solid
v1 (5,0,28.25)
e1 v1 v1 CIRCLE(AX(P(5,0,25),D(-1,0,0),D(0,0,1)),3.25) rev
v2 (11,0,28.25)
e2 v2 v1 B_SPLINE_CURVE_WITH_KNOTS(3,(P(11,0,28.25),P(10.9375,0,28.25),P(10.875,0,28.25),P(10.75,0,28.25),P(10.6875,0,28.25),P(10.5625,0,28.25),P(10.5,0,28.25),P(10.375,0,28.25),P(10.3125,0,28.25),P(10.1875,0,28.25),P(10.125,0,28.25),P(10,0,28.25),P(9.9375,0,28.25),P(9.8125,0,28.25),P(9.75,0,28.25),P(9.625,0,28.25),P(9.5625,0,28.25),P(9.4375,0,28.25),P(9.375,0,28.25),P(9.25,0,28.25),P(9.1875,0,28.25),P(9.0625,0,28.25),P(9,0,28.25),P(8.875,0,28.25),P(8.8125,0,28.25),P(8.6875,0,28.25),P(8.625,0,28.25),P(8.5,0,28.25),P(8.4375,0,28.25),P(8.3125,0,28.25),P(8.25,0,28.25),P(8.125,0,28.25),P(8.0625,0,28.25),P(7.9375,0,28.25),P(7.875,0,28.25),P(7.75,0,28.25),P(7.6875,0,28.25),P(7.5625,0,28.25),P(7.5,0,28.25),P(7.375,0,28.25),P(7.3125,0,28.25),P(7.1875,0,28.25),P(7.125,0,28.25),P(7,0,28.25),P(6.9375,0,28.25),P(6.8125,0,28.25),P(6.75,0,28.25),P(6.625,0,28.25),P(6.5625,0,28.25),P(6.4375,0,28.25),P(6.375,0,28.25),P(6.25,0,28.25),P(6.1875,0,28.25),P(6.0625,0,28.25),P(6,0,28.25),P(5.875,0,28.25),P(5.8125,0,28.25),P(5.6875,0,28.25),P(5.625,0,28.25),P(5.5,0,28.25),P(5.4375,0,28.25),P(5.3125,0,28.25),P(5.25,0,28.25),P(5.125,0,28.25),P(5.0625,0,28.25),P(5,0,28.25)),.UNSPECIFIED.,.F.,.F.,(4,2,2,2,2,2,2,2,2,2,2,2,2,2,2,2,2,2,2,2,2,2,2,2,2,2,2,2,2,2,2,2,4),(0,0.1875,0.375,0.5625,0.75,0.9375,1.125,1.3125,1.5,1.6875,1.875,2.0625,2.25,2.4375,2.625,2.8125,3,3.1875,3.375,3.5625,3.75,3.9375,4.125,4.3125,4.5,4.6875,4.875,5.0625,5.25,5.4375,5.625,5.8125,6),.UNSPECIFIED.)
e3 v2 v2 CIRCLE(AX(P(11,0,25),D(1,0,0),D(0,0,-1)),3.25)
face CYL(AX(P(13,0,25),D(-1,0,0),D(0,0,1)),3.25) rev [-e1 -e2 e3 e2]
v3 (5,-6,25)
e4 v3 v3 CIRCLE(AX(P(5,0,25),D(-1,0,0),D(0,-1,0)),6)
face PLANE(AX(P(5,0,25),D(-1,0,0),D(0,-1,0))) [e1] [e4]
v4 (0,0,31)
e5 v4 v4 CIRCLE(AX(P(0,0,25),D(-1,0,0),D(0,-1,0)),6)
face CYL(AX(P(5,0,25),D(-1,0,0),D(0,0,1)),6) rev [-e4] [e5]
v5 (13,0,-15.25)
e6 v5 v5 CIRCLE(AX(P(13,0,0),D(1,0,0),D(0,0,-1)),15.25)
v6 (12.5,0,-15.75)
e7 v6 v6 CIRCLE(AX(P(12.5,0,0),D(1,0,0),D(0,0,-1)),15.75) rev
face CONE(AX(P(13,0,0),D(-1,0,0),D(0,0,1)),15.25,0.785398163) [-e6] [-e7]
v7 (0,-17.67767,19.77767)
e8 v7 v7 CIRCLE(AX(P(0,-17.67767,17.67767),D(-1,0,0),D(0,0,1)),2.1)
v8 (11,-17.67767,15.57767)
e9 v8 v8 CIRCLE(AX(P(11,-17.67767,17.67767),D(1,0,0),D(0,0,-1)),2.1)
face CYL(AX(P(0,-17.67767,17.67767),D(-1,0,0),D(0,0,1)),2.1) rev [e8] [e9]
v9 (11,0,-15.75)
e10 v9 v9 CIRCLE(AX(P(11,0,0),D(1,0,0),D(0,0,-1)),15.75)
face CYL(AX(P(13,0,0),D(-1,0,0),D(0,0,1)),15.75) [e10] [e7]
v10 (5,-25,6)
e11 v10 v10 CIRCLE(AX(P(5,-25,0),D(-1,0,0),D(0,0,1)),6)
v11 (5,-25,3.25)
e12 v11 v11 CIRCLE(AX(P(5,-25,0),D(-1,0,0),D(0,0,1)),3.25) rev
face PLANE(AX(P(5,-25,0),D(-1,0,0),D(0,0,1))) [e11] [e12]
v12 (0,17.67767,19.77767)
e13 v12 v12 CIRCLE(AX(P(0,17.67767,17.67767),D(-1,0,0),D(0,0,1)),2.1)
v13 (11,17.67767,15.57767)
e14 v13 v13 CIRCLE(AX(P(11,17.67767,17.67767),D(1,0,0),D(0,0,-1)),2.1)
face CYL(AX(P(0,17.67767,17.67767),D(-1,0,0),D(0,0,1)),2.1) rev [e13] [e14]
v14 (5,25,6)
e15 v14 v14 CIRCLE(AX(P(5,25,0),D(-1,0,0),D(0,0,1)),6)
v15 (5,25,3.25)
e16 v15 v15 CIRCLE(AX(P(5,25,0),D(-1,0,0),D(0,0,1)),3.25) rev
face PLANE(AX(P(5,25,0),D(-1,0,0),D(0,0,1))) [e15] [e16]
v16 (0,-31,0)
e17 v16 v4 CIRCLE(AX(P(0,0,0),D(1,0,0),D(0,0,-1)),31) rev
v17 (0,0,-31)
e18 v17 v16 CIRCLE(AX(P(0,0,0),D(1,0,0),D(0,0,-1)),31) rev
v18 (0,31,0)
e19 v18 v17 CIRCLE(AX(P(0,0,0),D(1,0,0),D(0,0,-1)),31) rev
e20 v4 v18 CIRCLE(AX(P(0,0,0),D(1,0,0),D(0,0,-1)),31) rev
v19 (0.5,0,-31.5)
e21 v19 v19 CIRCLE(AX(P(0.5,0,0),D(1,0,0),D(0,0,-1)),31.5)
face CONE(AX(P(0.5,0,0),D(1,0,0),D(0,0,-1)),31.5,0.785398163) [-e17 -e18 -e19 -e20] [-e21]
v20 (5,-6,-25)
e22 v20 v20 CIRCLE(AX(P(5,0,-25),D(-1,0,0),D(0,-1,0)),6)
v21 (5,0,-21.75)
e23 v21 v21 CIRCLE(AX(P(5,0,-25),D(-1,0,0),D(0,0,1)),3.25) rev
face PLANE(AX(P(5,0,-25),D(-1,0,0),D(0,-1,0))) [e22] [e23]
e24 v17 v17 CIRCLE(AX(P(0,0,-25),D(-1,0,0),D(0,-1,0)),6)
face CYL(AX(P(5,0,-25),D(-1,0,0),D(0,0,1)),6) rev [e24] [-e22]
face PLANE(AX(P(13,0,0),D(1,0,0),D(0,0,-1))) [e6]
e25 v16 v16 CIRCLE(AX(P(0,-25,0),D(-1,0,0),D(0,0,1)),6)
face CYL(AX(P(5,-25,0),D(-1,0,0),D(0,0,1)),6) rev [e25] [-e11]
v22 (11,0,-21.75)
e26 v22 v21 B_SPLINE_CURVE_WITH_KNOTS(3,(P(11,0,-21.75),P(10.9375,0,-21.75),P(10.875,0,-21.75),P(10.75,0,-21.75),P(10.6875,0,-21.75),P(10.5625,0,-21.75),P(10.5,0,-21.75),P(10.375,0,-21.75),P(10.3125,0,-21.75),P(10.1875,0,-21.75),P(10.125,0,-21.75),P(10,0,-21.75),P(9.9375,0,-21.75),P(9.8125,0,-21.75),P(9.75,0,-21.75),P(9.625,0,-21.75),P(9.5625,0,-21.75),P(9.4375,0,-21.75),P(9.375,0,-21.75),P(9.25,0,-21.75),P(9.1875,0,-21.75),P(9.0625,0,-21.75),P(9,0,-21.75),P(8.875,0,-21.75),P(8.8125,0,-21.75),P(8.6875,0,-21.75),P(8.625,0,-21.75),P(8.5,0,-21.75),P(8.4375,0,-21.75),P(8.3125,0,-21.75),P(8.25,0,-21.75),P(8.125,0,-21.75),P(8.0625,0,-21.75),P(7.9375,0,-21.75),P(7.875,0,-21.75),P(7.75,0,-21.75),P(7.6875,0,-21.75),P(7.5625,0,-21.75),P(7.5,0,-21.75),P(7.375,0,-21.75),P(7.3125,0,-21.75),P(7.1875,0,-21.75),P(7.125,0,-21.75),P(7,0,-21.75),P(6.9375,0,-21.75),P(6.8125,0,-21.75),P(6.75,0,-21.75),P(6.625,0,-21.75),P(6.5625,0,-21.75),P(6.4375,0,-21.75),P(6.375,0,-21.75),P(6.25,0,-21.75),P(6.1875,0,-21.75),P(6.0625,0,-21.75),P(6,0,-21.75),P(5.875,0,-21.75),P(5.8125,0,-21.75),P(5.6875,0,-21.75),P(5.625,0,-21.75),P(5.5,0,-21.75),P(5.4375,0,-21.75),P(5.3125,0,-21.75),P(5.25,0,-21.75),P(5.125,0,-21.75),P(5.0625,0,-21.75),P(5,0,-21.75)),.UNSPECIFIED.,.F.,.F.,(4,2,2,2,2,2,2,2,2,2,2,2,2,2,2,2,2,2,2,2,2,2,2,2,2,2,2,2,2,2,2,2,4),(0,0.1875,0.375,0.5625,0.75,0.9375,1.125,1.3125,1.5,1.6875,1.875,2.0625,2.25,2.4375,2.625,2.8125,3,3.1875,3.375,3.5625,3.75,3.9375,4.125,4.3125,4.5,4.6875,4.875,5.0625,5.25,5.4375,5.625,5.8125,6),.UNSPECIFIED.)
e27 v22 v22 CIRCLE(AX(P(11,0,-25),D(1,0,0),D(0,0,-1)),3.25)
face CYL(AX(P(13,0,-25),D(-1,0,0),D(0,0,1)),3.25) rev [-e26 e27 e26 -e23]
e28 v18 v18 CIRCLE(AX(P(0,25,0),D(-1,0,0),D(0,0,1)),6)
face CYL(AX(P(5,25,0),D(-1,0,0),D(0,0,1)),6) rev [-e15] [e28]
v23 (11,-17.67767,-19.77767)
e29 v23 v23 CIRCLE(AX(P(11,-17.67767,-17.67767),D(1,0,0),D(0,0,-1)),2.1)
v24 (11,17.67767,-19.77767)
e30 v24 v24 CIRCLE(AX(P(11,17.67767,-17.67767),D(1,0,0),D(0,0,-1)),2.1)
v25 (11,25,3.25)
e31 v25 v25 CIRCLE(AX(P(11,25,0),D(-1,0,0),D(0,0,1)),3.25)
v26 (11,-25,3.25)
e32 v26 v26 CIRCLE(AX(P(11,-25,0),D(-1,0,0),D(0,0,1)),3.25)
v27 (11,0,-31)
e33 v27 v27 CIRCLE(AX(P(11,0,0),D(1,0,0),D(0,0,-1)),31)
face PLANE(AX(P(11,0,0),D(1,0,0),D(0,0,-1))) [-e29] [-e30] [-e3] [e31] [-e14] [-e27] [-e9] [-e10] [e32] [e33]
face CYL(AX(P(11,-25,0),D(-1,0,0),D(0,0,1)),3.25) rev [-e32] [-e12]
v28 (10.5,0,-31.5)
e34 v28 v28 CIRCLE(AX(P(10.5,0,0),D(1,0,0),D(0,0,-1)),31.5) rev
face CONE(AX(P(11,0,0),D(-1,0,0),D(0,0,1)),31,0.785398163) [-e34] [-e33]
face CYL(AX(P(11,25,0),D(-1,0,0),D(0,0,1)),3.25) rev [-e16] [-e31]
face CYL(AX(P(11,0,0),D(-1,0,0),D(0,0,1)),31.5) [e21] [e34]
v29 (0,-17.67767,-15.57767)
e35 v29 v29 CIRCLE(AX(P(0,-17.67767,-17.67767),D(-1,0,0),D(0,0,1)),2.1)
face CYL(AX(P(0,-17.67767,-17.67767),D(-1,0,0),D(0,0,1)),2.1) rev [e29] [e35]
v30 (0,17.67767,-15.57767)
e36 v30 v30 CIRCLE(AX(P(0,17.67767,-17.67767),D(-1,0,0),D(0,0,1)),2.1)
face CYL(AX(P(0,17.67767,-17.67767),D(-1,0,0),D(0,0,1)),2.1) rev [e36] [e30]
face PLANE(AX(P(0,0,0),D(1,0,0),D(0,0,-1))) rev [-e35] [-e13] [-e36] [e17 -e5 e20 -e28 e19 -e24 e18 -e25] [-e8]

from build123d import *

# Parameters (mm, degrees)
SKETCH1_R           = 31.5
BOSS_EXTRUDE1_DEPTH = 11
SKETCH2_R           = 3.25
CUT_EXTRUDE1_DEPTH  = 46.885727629
SKETCH3_R           = 6
CUT_EXTRUDE2_DEPTH  = 5
CHAMFER1_SIZE       = 0.5
SKETCH4_R           = 15.75
BOSS_EXTRUDE2_DEPTH = 2
CHAMFER2_SIZE       = 0.5
CIRPATTERN1_COUNT   = 4
M5_TAPPED_HOLE1_D   = 4.2


with BuildPart() as part:
    # Sketch1 → Boss-Extrude1 (new body)
    with BuildSketch(Plane(origin=(0, 0, 0), x_dir=(0, 0, -1), z_dir=(1, 0, 0))):
        Circle(SKETCH1_R)
    extrude(amount=BOSS_EXTRUDE1_DEPTH)

    # Sketch2 → Cut-Extrude1 (cut, through all)
    with BuildSketch(Plane.ZY):
        with Locations((0, 25)):
            Circle(SKETCH2_R)
        with Locations((0, -25)):
            Circle(SKETCH2_R)
    cut_extrude1 = extrude(amount=-CUT_EXTRUDE1_DEPTH, mode=Mode.SUBTRACT)

    # Sketch3 → Cut-Extrude2 (cut)
    with BuildSketch(Plane.ZY):
        with Locations((0, 25)):
            Circle(SKETCH3_R)
        with Locations((0, -25)):
            Circle(SKETCH3_R)
    cut_extrude2 = extrude(amount=-CUT_EXTRUDE2_DEPTH, mode=Mode.SUBTRACT)

    # Chamfer1
    chamfer1_edges = [part.edges().sort_by_distance(p)[0] for p in [
        (0, 0, 31.5),
        (11, 0, 31.5),
    ]]
    chamfer(chamfer1_edges, length=CHAMFER1_SIZE - 0.0001)  # a hair under: the kernel refuses the full size

    # Sketch4 → Boss-Extrude2 (add)
    with BuildSketch(Plane(origin=(11, 0, 0), x_dir=(0, 0, -1), z_dir=(1, 0, 0))):
        Circle(SKETCH4_R)
    extrude(amount=BOSS_EXTRUDE2_DEPTH)

    # Chamfer2
    chamfer2_edges = [part.edges().sort_by_distance(p)[0] for p in [
        (13, 0, 15.75),
    ]]
    chamfer(chamfer2_edges, length=CHAMFER2_SIZE)

    # CirPattern1: Cut-Extrude1, Cut-Extrude2 ×4 about axis
    cirpattern1_axis = Axis((0, 0, 0), (1, 0, 0))
    add([cut_extrude1.rotate(cirpattern1_axis, i * 360 / CIRPATTERN1_COUNT) for i in range(1, CIRPATTERN1_COUNT)], mode=Mode.SUBTRACT)
    add([cut_extrude2.rotate(cirpattern1_axis, i * 360 / CIRPATTERN1_COUNT) for i in range(1, CIRPATTERN1_COUNT)], mode=Mode.SUBTRACT)

    # M5 Tapped Hole1 (through all)
    with Locations(Plane(origin=(0, 17.67766953, -17.67766953), x_dir=(0, 0, -1), z_dir=(-1, 0, 0))):
        with Locations((0, 0), (-35.35533906, 0), (0, 35.35533906), (-35.35533906, 35.35533906)):
            Hole(M5_TAPPED_HOLE1_D / 2)


solid = part.part
